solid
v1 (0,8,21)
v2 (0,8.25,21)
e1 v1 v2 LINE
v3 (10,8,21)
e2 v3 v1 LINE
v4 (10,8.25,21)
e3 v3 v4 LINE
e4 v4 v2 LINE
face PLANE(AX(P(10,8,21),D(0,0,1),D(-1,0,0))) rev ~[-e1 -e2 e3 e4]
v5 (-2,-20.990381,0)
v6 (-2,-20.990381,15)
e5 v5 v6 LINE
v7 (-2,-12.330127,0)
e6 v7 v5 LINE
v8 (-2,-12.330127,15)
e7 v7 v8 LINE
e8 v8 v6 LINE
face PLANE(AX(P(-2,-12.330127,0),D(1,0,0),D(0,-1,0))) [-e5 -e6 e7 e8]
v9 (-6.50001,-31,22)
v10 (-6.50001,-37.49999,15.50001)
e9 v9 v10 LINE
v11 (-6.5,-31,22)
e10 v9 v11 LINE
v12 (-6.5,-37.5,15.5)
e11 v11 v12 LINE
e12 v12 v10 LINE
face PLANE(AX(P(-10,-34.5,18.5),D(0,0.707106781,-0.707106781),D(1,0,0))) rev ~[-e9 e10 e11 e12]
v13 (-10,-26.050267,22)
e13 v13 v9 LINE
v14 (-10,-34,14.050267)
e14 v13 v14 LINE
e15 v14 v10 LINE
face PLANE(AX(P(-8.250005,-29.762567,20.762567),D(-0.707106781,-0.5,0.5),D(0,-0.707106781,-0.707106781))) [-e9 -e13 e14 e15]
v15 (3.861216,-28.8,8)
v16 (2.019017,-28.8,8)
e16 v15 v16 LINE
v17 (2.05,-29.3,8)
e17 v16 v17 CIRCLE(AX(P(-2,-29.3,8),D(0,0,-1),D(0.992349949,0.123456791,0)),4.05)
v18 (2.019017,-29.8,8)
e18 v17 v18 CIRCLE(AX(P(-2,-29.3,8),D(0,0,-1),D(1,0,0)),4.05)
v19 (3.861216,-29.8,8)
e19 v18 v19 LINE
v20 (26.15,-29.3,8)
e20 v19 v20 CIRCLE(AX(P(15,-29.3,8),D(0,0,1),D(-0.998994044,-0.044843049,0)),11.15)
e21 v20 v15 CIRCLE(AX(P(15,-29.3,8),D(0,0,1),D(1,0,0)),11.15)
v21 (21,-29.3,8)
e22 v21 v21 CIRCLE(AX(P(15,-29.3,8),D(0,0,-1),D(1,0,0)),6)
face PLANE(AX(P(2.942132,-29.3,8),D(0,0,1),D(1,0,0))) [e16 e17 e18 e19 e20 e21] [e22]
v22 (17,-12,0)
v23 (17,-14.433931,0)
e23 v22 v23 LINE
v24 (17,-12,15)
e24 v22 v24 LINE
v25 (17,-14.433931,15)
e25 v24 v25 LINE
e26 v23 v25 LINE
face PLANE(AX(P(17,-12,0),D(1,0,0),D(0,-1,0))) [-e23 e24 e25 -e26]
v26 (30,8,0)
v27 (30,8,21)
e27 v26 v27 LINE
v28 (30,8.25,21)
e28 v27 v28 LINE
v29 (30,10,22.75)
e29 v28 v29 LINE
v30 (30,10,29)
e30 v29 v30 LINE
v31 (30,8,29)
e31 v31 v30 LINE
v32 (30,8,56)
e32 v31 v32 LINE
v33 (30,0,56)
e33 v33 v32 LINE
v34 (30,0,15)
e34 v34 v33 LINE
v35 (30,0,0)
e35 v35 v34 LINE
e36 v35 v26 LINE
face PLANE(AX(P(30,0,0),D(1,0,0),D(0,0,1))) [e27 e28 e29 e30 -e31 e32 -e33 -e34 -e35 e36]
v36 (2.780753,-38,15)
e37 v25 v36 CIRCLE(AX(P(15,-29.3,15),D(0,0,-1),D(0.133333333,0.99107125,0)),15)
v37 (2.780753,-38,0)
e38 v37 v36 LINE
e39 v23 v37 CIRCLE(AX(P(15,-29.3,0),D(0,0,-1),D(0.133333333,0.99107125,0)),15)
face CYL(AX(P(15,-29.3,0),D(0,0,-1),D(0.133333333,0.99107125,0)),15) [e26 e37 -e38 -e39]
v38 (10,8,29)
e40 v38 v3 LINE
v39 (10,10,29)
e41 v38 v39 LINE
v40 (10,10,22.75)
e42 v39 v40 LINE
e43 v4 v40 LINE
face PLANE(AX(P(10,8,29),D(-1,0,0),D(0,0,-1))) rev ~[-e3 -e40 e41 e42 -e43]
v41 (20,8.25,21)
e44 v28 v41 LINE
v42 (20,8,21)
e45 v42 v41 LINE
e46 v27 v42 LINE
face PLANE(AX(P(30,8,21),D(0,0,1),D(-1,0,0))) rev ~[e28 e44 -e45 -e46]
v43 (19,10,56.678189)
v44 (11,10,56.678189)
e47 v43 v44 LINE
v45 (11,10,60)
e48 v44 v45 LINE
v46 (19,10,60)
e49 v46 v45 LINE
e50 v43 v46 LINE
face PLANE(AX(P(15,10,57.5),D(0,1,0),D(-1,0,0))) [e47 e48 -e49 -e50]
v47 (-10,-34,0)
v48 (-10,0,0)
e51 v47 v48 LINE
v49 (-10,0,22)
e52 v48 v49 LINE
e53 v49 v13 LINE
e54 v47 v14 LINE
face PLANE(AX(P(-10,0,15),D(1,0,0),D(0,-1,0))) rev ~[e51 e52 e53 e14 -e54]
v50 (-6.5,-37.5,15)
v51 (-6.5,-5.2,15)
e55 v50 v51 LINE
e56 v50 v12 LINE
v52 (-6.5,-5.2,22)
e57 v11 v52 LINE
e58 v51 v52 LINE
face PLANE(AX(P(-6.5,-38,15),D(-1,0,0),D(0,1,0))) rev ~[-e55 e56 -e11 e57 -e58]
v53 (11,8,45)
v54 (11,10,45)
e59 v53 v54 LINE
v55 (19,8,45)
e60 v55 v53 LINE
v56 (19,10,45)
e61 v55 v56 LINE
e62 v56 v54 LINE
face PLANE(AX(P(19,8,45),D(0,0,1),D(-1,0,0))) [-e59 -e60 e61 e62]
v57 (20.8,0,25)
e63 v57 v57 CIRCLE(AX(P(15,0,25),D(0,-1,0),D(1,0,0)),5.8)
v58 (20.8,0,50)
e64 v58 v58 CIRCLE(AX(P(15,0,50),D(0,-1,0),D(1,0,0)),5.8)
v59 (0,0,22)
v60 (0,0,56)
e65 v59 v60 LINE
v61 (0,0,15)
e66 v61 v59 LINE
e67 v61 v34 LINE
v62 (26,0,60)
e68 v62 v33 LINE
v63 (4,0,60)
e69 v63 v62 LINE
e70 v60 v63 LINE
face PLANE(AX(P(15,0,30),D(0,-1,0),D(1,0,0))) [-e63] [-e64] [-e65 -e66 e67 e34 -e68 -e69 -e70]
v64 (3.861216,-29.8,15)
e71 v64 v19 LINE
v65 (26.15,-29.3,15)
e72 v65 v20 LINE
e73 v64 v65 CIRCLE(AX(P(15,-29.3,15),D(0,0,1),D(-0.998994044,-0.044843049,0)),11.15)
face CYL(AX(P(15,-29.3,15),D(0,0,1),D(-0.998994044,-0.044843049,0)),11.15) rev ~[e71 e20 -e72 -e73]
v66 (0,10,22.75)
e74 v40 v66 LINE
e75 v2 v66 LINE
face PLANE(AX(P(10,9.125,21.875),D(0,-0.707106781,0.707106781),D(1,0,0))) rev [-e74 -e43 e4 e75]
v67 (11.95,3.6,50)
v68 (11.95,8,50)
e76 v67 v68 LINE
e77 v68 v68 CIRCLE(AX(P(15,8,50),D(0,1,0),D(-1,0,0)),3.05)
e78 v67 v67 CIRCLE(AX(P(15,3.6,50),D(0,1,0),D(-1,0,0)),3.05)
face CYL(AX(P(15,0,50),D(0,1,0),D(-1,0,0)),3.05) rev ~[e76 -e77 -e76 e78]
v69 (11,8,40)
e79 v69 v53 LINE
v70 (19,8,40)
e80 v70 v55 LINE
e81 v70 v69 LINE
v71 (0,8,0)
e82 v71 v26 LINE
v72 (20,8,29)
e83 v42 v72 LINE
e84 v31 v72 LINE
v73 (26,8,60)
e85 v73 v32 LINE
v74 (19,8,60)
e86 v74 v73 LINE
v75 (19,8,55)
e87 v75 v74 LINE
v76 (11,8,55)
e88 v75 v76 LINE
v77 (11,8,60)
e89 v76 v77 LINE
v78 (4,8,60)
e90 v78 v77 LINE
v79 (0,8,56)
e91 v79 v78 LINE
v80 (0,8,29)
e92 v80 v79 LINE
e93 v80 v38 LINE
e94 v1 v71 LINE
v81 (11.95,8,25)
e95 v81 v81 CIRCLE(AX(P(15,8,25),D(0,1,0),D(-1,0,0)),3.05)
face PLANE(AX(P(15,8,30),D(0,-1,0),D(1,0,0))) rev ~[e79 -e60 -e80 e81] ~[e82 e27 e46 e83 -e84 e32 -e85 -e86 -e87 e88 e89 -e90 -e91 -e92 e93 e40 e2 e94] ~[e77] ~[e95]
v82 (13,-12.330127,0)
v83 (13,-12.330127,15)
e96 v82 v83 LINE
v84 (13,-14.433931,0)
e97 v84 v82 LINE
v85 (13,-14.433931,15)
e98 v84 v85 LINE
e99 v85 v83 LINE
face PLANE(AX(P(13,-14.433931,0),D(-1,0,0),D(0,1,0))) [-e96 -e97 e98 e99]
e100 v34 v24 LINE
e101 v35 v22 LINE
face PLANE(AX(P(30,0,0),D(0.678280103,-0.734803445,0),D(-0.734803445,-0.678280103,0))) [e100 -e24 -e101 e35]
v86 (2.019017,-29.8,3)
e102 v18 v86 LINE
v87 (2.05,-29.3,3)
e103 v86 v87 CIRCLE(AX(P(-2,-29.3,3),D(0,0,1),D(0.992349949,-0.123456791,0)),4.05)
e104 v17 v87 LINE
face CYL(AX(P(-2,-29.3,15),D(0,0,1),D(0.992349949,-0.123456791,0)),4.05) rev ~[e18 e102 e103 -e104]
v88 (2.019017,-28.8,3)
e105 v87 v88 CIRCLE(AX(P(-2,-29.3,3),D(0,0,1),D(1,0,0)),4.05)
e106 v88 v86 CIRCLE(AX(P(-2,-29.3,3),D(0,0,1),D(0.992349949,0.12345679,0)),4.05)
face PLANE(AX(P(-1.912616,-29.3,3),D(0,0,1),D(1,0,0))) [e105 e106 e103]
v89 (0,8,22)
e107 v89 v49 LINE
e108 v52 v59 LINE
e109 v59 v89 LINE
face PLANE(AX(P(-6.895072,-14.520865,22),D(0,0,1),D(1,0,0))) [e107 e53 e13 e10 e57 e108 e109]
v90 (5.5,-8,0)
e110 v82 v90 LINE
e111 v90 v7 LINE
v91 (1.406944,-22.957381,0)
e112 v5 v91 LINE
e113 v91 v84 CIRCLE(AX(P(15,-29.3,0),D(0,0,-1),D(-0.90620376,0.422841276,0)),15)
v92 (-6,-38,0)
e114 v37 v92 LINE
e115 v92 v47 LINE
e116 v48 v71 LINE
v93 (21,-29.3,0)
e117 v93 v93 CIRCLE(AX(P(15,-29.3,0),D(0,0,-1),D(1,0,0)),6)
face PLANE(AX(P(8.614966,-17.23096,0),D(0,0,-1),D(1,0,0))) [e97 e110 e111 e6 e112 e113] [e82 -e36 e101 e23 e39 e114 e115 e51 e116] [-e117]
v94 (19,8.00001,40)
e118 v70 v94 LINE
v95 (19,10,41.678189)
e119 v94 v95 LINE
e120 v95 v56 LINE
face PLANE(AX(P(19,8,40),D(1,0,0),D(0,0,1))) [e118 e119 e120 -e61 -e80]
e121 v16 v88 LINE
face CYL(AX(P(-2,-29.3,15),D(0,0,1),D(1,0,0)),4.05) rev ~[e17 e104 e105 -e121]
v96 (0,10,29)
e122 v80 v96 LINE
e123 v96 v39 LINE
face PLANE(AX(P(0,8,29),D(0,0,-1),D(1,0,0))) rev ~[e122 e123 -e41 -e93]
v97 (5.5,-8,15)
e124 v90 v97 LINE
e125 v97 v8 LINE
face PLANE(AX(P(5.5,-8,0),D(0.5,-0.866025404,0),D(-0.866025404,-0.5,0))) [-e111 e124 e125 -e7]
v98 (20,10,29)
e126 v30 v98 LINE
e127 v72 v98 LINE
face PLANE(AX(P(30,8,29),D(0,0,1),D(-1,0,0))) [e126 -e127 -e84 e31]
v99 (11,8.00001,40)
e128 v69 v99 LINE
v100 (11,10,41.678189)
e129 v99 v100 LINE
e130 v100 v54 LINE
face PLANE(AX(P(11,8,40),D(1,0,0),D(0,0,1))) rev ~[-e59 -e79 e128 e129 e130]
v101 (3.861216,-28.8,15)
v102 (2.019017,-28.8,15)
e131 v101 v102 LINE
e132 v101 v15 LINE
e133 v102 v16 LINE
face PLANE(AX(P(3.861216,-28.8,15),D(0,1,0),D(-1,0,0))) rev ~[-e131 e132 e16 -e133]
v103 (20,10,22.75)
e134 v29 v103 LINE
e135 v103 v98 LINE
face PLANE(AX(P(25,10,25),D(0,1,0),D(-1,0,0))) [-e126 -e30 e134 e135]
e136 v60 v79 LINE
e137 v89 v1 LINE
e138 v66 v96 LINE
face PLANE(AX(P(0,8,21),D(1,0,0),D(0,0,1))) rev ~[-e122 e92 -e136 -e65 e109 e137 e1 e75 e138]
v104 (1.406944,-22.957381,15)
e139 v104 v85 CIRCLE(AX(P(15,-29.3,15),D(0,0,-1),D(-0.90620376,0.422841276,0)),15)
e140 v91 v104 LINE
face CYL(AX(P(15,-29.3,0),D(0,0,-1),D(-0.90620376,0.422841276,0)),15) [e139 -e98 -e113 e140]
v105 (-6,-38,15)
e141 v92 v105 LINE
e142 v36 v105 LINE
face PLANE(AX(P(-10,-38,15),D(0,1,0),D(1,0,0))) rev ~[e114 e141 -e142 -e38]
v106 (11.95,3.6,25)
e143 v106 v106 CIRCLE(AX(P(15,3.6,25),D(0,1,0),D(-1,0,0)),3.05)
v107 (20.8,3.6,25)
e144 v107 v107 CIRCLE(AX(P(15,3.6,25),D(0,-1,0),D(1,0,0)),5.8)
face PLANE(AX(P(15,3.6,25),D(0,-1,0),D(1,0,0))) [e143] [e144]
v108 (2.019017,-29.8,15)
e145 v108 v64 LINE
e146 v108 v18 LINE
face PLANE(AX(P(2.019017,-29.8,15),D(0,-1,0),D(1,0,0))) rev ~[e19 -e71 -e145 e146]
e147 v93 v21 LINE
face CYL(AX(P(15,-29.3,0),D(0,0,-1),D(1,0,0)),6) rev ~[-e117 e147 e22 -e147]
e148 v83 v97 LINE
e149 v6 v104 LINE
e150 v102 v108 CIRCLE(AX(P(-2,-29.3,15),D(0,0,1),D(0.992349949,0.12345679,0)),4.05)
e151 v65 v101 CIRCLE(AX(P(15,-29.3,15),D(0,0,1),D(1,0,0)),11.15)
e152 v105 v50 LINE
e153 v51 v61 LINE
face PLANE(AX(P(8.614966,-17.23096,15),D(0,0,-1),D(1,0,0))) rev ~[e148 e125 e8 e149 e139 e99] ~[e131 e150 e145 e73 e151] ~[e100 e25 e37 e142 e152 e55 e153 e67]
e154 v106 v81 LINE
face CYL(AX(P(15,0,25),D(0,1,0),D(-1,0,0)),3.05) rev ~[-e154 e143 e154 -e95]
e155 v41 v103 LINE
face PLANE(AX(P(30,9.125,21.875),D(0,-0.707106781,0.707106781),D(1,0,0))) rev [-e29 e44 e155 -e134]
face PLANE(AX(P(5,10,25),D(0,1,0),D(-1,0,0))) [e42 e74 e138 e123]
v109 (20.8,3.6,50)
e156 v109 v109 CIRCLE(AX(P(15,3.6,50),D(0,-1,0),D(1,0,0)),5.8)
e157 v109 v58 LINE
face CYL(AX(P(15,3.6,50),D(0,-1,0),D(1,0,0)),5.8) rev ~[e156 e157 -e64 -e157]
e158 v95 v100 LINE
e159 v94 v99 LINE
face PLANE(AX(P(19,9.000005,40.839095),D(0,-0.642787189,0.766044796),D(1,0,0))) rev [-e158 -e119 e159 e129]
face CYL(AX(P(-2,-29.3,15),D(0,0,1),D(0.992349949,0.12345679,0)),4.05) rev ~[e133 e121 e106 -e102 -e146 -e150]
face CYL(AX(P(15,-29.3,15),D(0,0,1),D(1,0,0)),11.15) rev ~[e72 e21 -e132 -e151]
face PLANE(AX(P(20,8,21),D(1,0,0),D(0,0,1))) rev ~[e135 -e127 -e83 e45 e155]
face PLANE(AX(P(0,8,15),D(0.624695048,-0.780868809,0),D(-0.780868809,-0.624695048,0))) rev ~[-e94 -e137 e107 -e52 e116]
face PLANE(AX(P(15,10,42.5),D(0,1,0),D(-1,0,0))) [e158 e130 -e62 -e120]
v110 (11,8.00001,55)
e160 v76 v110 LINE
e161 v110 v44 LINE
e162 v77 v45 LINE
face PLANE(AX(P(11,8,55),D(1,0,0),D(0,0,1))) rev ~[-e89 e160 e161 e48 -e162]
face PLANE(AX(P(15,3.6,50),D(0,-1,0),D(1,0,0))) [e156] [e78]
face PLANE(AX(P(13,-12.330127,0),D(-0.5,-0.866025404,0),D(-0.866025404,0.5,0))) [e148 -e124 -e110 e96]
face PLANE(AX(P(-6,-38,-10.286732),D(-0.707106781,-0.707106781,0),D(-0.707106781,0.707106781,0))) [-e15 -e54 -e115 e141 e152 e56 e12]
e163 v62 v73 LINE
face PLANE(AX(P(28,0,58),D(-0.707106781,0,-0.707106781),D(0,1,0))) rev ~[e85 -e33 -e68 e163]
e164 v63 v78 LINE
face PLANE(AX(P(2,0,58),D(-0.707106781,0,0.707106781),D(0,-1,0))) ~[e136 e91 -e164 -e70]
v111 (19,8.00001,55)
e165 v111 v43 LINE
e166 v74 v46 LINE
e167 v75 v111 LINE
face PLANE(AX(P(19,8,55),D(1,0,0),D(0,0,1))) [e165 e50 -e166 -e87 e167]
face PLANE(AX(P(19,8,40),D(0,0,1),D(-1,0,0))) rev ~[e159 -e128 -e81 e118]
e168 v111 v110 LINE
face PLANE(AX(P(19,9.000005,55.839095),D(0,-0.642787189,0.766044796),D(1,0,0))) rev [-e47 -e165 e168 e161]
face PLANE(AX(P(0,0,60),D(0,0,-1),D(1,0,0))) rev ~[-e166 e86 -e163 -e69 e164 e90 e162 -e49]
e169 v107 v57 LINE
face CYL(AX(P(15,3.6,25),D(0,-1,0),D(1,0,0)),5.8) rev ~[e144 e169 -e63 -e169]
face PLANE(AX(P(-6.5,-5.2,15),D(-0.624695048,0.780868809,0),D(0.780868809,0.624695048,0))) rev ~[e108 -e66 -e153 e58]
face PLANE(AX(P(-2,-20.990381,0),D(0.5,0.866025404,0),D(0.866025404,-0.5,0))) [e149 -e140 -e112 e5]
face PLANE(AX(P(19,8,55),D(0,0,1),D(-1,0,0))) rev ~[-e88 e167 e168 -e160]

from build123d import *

# Parameters (mm, degrees)
F0_W           = 30
F0_H           = 60
F1_DEPTH       = 8
F2_D           = 6.1
F2_CBORE_D     = 11.6
F2_CBORE_DEPTH = 3.6
F3_R           = 6
F4_DEPTH       = 15
F6_DEPTH       = 12
F5_R           = 6
F7_DEPTH       = 7
F9_DEPTH       = 7
F10_SIZE       = 7
F11_W          = 8
F11_H          = 5
F11_W_2        = 10
F11_H_2        = 8
F12_DEPTH      = 2
F13_SIZE2      = 1.678189
F13_SIZE       = 1.99999
F13_2_SIZE2    = 1.678189
F13_2_SIZE     = 1.99999
F14_SIZE2      = 1.75
F14_SIZE       = 1.75
F15_T1_DEPTH   = 35.5734639037
F16_SIZE       = 3.49999
F17_SIZE       = 4


# Not quite as in the source:
# - a fillet or chamfer that OpenCascade refuses, or shapes differently, is made with other operations: its cross-section is extruded or revolved along the edge and cut away or added
# - a fillet or chamfer is up to 0.001 mm smaller than in the source, because OpenCascade refuses the exact size


with BuildPart() as f1:
    # F0 (on Front) → F1 (new body)
    with BuildSketch(Plane.XZ):
        with Locations((15, 30)):
            Rectangle(F0_W, F0_H)
    extrude(amount=-F1_DEPTH)

    # F2 (through all)
    with Locations(Plane.XZ):
        with Locations((15, 50), (15, 25)):
            CounterBoreHole(F2_D / 2, F2_CBORE_D / 2, F2_CBORE_DEPTH)

    # F3 (on face) → F4 (join)
    with BuildSketch(Plane(origin=(0, 0, 0), x_dir=(1, 0, 0), z_dir=(0, 0, -1))):
        with BuildLine():
            Line((-10, 0), (0, -8))
            Line((0, -8), (0, 0))
            Line((0, 0), (30, 0))
            Line((30, 0), (17, 12))
            Line((17, 12), (17, 14.4339312527))
            ThreePointArc((17, 14.4339312527), (27.843214237, 37.0493127477), (2.7807528874, 38))
            Line((2.7807528874, 38), (-10, 38))
            Line((-10, 38), (-10, 0))
        make_face()
        Polygon((-2, 12.3301270189), (-2, 20.9903810568), (1.4069435951, 22.9573808585), (5.5, 25.3205080757), (13, 20.9903810568), (13, 14.4339312527), (13, 12.3301270189), (5.5, 8), align=None, mode=Mode.SUBTRACT)
        with Locations((15, 29.3)):
            Circle(F3_R, mode=Mode.SUBTRACT)
        with BuildLine():
            Line((5.5, 25.3205080757), (1.4069435951, 22.9573808585))
            ThreePointArc((1.4069435951, 22.9573808585), (6.1147228345, 17.2148086613), (13, 14.4339312527))
            Line((13, 14.4339312527), (13, 20.9903810568))
            Line((13, 20.9903810568), (5.5, 25.3205080757))
        make_face()
    extrude(amount=-F4_DEPTH)

    # F5 (on face) → F6 (cut)
    with BuildSketch(Plane.XY.offset(15)):
        with BuildLine():
            ThreePointArc((2.0190172928, -29.8), (2.0422469022, -29.5504795042), (2.05, -29.3))
            ThreePointArc((2.05, -29.3), (2.0422469022, -29.0495204958), (2.0190172928, -28.8))
            ThreePointArc((2.0190172928, -28.8), (-6.05, -29.3), (2.0190172928, -29.8))
        make_face()
    extrude(amount=-F6_DEPTH, mode=Mode.SUBTRACT)

    # F5 (on face) → F7 (cut)
    with BuildSketch(Plane.XY.offset(15)):
        with BuildLine():
            ThreePointArc((2.0190172928, -28.8), (2.0422469022, -29.0495204958), (2.05, -29.3))
            ThreePointArc((2.05, -29.3), (2.0422469022, -29.5504795042), (2.0190172928, -29.8))
            Line((2.0190172928, -29.8), (3.8612164039, -29.8))
            ThreePointArc((3.8612164039, -29.8), (3.85, -29.3), (3.8612164039, -28.8))
            Line((3.8612164039, -28.8), (2.0190172928, -28.8))
        make_face()
        with BuildLine():
            ThreePointArc((26.15, -29.3), (15.2500628959, -18.1528044537), (3.8612164039, -28.8))
            ThreePointArc((3.8612164039, -28.8), (3.85, -29.3), (3.8612164039, -29.8))
            ThreePointArc((3.8612164039, -29.8), (15.2500628959, -40.4471955463), (26.15, -29.3))
        make_face()
        with Locations((15, -29.3)):
            Circle(F5_R, mode=Mode.SUBTRACT)
        with Locations((15, -29.3)):
            Circle(F5_R)
    extrude(amount=-F7_DEPTH, mode=Mode.SUBTRACT)

    # F8 (on face) → F9 (join)
    with BuildSketch(Plane.XY.offset(15)):
        Polygon((-6.5, -5.2), (0, 0), (0, 8), (-10, 0), (-10, -38), (-6.5, -38), align=None)
    extrude(amount=F9_DEPTH)

    # F10
    f10_edges = [f1.edges().sort_by_distance(p)[0] for p in [
        (-8.25, -38, 22),
    ]]
    chamfer(f10_edges, length=F10_SIZE)

    # F11 (on face) → F12 (join)
    with BuildSketch(Plane(origin=(0, 8, 0), x_dir=(-1, 0, 0), z_dir=(0, 1, 0))):
        with Locations((-15, 57.5)):
            Rectangle(F11_W, F11_H)
        with Locations((-15, 42.5)):
            Rectangle(F11_W, F11_H)
        Polygon((0, 22), (0, 29), (-10, 29), (-10, 21), (0, 21), align=None)
        with Locations((-25, 25)):
            Rectangle(F11_W_2, F11_H_2)
    extrude(amount=F12_DEPTH)

    # F13 (size 2 and 1.6781992624 in the source; OpenCascade refuses exactly that, so slightly less here)
    f13_edges = [f1.edges().sort_by_distance(p)[0] for p in [
        (15, 10, 55),
    ]]
    f13_side = f1.faces().sort_by_distance((15, 9, 55))[0]
    chamfer(f13_edges, length=F13_SIZE, length2=F13_SIZE2, reference=f13_side)

    # F13#2 (size 2 and 1.6781992624 in the source; OpenCascade refuses exactly that, so slightly less here)
    f13_2_edges = [f1.edges().sort_by_distance(p)[0] for p in [
        (15, 10, 40),
    ]]
    f13_2_side = f1.faces().sort_by_distance((15, 9, 40))[0]
    chamfer(f13_2_edges, length=F13_2_SIZE, length2=F13_2_SIZE2, reference=f13_2_side)

    # F14
    f14_edges = [f1.edges().sort_by_distance(p)[0] for p in [
        (25, 10, 21),
        (5, 10, 21),
    ]]
    chamfer(f14_edges, length=F14_SIZE, length2=F14_SIZE2)

    # F15: chamfer of 4 on 1 edges, made by hand

    # F15_s2 → F15_t1 (cut)
    with BuildSketch(Plane.XY.offset(-10.2867319519)):
        Polygon((-6, -38), (-10, -34), (-10, -38), align=None)
    extrude(amount=F15_T1_DEPTH, mode=Mode.SUBTRACT)

    # F16 (size 3.5 in the source; OpenCascade refuses exactly that, so slightly less here)
    f16_edges = [f1.edges().sort_by_distance(p)[0] for p in [
        (-10, -32.5, 20.5),
    ]]
    chamfer(f16_edges, length=F16_SIZE)

    # F17
    f17_edges = [f1.edges().sort_by_distance(p)[0] for p in [
        (30, 4, 60),
        (0, 4, 60),
    ]]
    chamfer(f17_edges, length=F17_SIZE)


solid = f1.part
